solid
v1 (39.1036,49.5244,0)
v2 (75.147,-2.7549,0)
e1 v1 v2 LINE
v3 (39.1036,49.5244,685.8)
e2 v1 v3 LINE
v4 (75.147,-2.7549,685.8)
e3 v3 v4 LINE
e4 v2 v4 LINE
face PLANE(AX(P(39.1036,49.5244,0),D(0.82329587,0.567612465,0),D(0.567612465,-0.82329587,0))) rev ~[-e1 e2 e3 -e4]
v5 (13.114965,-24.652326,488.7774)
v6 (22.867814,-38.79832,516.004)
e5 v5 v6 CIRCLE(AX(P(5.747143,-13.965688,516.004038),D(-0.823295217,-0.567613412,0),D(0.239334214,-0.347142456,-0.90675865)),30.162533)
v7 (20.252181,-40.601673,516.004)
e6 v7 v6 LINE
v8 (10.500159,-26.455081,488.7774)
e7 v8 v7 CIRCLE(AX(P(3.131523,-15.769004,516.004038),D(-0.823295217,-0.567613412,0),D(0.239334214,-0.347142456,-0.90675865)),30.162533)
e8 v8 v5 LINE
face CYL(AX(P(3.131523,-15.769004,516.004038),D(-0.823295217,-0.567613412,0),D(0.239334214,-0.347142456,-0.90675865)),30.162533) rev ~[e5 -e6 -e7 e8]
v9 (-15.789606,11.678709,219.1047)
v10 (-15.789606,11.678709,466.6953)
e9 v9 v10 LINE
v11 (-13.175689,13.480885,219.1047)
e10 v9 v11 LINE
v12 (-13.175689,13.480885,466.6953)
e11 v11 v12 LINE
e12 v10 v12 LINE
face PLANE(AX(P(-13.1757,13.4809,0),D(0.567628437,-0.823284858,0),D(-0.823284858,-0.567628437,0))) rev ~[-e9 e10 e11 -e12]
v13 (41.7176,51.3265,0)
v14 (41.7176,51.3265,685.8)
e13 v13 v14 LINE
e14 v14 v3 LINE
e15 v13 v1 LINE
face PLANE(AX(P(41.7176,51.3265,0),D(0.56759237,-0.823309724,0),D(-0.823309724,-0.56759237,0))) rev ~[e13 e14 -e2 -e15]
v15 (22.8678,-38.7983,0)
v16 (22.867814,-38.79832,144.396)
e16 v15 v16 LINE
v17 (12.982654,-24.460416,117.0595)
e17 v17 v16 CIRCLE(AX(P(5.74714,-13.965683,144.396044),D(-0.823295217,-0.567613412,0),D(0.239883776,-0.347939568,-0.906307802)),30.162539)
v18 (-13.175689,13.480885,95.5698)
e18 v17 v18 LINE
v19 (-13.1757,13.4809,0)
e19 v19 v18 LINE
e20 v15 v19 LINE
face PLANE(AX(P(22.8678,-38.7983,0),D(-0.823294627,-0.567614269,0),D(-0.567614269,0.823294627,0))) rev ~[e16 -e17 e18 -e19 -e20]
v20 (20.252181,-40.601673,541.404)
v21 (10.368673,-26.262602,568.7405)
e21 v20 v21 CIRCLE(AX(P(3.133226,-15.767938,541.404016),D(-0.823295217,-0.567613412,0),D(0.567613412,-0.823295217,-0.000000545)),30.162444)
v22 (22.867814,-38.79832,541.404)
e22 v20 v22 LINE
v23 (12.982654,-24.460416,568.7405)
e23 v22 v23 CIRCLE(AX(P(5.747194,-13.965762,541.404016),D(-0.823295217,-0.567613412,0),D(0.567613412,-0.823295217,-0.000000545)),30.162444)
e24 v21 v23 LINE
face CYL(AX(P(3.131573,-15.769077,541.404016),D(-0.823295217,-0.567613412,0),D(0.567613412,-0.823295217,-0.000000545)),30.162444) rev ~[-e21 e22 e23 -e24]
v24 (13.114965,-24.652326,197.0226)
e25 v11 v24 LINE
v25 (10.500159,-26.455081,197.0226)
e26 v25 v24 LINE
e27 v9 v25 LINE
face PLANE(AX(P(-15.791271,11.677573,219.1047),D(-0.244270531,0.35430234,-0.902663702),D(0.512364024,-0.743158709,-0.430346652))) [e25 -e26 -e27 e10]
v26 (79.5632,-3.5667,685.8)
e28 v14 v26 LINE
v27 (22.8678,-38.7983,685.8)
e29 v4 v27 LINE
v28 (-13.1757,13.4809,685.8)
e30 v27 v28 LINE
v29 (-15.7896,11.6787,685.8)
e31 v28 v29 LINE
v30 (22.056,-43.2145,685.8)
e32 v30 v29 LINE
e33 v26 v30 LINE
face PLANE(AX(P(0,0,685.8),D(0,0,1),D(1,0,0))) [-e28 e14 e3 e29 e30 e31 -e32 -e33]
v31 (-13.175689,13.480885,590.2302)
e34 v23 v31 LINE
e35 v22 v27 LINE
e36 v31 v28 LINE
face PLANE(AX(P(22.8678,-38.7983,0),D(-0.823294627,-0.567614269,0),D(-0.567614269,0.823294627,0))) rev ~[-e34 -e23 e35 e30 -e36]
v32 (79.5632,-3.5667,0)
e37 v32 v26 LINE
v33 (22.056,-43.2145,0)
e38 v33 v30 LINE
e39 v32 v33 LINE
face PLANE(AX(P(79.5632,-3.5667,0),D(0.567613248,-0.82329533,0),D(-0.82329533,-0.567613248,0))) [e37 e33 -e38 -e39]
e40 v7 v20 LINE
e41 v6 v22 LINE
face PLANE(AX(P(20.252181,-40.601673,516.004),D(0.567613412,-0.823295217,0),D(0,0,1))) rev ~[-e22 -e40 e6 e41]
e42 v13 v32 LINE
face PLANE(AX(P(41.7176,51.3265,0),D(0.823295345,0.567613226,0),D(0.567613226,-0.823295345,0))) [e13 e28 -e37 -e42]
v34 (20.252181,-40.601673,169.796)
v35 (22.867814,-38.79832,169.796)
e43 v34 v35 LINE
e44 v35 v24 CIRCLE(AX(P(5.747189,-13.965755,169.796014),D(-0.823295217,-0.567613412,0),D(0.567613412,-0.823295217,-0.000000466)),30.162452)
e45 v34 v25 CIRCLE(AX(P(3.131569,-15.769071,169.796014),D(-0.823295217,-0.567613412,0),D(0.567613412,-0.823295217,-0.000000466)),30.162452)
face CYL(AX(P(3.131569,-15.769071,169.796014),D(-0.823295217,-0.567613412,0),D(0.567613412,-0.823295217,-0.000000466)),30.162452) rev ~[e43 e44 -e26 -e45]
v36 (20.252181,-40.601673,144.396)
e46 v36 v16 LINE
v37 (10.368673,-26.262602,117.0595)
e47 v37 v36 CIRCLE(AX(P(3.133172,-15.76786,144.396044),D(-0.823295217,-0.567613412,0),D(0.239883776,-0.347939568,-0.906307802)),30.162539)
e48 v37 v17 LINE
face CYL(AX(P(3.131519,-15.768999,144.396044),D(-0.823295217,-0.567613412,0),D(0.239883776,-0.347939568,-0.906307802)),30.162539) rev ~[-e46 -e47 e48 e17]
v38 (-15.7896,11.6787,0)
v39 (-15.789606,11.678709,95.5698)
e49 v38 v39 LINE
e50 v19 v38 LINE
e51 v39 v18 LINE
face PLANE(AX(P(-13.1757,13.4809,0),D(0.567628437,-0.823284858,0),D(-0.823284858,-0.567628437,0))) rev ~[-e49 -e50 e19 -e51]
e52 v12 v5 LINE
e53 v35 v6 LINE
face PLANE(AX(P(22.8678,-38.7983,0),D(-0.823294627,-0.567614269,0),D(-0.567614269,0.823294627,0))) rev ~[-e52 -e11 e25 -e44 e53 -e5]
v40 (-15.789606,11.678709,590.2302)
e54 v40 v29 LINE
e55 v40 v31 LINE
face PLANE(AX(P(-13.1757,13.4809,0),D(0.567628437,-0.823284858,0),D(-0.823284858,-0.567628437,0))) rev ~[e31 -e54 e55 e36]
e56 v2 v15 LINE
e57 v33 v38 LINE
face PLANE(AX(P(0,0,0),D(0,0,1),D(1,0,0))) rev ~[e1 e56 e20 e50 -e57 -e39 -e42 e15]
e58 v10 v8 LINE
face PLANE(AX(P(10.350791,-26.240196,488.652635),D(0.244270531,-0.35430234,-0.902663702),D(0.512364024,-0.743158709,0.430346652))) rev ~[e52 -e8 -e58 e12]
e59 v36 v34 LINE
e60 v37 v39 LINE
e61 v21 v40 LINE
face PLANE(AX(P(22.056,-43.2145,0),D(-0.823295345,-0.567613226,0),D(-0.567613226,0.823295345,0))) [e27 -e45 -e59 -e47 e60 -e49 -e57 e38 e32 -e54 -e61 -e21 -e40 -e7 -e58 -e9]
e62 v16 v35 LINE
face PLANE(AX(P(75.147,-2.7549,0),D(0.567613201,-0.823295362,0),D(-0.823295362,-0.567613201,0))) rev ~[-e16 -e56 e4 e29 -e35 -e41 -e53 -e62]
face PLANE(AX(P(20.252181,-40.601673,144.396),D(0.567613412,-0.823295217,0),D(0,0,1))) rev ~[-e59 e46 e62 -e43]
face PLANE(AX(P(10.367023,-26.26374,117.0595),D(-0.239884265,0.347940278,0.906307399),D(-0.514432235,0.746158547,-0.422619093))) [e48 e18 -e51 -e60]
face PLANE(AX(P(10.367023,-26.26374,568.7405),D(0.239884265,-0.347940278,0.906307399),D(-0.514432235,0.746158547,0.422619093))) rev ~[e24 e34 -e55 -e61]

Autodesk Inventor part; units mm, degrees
ref_plane "YZ Plane" through (0, 0, 0) normal (1, 0, 0) x (0, 1, 0)
ref_plane "XZ Plane" through (0, 0, 0) normal (0, 1, 0) x (-1, 0, 0)
ref_plane "XY Plane" through (0, 0, 0) normal (0, 0, 1) x (1, 0, 0)
sketch "Sketch1" plane through (0, 0, 0) normal (0, 0, 1) x (1, 0, 0)
  line L0 (39.1036, 49.5244) -> (75.147, -2.7549)
  line L1 (75.147, -2.7549) -> (22.8678, -38.7983)
  line L2 (22.8678, -38.7983) -> (-13.1757, 13.4809)
  line L3 (41.7176, 51.3265) -> (79.5632, -3.5667)
  line L4 (79.5632, -3.5667) -> (22.056, -43.2145)
  line L5 (22.056, -43.2145) -> (-15.7896, 11.6787)
  line L6 (-13.1757, 13.4809) -> (-15.7896, 11.6787)
  line L7 (41.7176, 51.3265) -> (39.1036, 49.5244)
  point P0 (0, 0)
  dimension "d0" = 63.5
  dimension "d1" = 63.5
  dimension "d2" = 63.5
  dimension "d3" = 3.175
extrude "Extrusion1" add sketch "Sketch1" along normal blind 685.8
sketch "Sketch2" plane through (22.056, -43.2145, 0) normal (-0.8232952, -0.5676134, 0) x (0, 0, 1)
  line L0 (0, 66.675) -> (0, 0) projected
  line L1 (0, 0) -> (685.8, 0) projected
  line L2 (685.8, 66.675) -> (685.8, 0) projected
  line L3 (0, 66.675) -> (685.8, 66.675) projected
  ellipse E0 centre (510.7417, -1678.7212) end of major axis (489.6597, -1678.7212) minor radius 19.9414 projected
  line L4 (0, 3.175) -> (685.8, 3.175) projected
  line L5 (568.7405, 20.5903) -> (590.2302, 66.675)
  line L6 (0, 66.675) -> (685.8, 66.675) projected
  line L7 (466.6953, 66.675) -> (590.2302, 66.675)
  line L8 (508, 66.675) -> (177.8, 66.675) construction
  line L9 (177.8, 20.6195) -> (508, 20.6195) construction
  line L10 (508, 20.6195) -> (558.8, 20.6195) construction
  line L11 (558.8, 20.6195) -> (558.8, 66.675) construction
  line L12 (558.8, 66.675) -> (508, 66.675) construction
  line L13 (508, 66.675) -> (508, 20.6195) construction
  line L14 (466.6953, 66.675) -> (488.7774, 20.3572)
  arc A0 (488.6539, 20.6195) -> (516.004, 3.175) centre (516.004, 33.3375) ccw
  line L15 (541.404, 3.175) -> (516.004, 3.175)
  line L16 (0, 3.175) -> (685.8, 3.175) projected
  arc A1 (541.404, 3.175) -> (568.7405, 20.5903) centre (541.404, 33.3375) ccw
  line L17 (342.9, 3.175) -> (342.9, 66.675) construction
  line L18 (117.0595, 20.5903) -> (95.5698, 66.675)
  line L19 (219.1047, 66.675) -> (95.5698, 66.675)
  line L20 (177.8, 20.6195) -> (127, 20.6195) construction
  line L21 (127, 20.6195) -> (127, 66.675) construction
  line L22 (127, 66.675) -> (177.8, 66.675) construction
  line L23 (177.8, 66.675) -> (177.8, 20.6195) construction
  line L24 (219.1047, 66.675) -> (197.0226, 20.3572)
  arc A2 (169.796, 3.175) -> (197.1461, 20.6195) centre (169.796, 33.3375) ccw
  line L25 (144.396, 3.175) -> (169.796, 3.175)
  arc A3 (117.0595, 20.5903) -> (144.396, 3.175) centre (144.396, 33.3375) ccw
  point P0 (0, 48.0976)
  point P1 (342.9, 20.6195)
  point P2 (175.0583, -1678.7212)
  point P3 (177.8, 66.675)
  dimension "d6" = 65
  dimension "d8" = 144.396
  dimension "d10" = 330.2
  dimension "d11" = 50.8
  dimension "d14" = 25.4
extrude "Extrusion2" cut sketch "Sketch2" against normal blind 6.35 contours L3 L24 A2 L4 A3 L18 | L3 L5 A1 L4 A0 L14
properties part number "2018 Concept Hook"
